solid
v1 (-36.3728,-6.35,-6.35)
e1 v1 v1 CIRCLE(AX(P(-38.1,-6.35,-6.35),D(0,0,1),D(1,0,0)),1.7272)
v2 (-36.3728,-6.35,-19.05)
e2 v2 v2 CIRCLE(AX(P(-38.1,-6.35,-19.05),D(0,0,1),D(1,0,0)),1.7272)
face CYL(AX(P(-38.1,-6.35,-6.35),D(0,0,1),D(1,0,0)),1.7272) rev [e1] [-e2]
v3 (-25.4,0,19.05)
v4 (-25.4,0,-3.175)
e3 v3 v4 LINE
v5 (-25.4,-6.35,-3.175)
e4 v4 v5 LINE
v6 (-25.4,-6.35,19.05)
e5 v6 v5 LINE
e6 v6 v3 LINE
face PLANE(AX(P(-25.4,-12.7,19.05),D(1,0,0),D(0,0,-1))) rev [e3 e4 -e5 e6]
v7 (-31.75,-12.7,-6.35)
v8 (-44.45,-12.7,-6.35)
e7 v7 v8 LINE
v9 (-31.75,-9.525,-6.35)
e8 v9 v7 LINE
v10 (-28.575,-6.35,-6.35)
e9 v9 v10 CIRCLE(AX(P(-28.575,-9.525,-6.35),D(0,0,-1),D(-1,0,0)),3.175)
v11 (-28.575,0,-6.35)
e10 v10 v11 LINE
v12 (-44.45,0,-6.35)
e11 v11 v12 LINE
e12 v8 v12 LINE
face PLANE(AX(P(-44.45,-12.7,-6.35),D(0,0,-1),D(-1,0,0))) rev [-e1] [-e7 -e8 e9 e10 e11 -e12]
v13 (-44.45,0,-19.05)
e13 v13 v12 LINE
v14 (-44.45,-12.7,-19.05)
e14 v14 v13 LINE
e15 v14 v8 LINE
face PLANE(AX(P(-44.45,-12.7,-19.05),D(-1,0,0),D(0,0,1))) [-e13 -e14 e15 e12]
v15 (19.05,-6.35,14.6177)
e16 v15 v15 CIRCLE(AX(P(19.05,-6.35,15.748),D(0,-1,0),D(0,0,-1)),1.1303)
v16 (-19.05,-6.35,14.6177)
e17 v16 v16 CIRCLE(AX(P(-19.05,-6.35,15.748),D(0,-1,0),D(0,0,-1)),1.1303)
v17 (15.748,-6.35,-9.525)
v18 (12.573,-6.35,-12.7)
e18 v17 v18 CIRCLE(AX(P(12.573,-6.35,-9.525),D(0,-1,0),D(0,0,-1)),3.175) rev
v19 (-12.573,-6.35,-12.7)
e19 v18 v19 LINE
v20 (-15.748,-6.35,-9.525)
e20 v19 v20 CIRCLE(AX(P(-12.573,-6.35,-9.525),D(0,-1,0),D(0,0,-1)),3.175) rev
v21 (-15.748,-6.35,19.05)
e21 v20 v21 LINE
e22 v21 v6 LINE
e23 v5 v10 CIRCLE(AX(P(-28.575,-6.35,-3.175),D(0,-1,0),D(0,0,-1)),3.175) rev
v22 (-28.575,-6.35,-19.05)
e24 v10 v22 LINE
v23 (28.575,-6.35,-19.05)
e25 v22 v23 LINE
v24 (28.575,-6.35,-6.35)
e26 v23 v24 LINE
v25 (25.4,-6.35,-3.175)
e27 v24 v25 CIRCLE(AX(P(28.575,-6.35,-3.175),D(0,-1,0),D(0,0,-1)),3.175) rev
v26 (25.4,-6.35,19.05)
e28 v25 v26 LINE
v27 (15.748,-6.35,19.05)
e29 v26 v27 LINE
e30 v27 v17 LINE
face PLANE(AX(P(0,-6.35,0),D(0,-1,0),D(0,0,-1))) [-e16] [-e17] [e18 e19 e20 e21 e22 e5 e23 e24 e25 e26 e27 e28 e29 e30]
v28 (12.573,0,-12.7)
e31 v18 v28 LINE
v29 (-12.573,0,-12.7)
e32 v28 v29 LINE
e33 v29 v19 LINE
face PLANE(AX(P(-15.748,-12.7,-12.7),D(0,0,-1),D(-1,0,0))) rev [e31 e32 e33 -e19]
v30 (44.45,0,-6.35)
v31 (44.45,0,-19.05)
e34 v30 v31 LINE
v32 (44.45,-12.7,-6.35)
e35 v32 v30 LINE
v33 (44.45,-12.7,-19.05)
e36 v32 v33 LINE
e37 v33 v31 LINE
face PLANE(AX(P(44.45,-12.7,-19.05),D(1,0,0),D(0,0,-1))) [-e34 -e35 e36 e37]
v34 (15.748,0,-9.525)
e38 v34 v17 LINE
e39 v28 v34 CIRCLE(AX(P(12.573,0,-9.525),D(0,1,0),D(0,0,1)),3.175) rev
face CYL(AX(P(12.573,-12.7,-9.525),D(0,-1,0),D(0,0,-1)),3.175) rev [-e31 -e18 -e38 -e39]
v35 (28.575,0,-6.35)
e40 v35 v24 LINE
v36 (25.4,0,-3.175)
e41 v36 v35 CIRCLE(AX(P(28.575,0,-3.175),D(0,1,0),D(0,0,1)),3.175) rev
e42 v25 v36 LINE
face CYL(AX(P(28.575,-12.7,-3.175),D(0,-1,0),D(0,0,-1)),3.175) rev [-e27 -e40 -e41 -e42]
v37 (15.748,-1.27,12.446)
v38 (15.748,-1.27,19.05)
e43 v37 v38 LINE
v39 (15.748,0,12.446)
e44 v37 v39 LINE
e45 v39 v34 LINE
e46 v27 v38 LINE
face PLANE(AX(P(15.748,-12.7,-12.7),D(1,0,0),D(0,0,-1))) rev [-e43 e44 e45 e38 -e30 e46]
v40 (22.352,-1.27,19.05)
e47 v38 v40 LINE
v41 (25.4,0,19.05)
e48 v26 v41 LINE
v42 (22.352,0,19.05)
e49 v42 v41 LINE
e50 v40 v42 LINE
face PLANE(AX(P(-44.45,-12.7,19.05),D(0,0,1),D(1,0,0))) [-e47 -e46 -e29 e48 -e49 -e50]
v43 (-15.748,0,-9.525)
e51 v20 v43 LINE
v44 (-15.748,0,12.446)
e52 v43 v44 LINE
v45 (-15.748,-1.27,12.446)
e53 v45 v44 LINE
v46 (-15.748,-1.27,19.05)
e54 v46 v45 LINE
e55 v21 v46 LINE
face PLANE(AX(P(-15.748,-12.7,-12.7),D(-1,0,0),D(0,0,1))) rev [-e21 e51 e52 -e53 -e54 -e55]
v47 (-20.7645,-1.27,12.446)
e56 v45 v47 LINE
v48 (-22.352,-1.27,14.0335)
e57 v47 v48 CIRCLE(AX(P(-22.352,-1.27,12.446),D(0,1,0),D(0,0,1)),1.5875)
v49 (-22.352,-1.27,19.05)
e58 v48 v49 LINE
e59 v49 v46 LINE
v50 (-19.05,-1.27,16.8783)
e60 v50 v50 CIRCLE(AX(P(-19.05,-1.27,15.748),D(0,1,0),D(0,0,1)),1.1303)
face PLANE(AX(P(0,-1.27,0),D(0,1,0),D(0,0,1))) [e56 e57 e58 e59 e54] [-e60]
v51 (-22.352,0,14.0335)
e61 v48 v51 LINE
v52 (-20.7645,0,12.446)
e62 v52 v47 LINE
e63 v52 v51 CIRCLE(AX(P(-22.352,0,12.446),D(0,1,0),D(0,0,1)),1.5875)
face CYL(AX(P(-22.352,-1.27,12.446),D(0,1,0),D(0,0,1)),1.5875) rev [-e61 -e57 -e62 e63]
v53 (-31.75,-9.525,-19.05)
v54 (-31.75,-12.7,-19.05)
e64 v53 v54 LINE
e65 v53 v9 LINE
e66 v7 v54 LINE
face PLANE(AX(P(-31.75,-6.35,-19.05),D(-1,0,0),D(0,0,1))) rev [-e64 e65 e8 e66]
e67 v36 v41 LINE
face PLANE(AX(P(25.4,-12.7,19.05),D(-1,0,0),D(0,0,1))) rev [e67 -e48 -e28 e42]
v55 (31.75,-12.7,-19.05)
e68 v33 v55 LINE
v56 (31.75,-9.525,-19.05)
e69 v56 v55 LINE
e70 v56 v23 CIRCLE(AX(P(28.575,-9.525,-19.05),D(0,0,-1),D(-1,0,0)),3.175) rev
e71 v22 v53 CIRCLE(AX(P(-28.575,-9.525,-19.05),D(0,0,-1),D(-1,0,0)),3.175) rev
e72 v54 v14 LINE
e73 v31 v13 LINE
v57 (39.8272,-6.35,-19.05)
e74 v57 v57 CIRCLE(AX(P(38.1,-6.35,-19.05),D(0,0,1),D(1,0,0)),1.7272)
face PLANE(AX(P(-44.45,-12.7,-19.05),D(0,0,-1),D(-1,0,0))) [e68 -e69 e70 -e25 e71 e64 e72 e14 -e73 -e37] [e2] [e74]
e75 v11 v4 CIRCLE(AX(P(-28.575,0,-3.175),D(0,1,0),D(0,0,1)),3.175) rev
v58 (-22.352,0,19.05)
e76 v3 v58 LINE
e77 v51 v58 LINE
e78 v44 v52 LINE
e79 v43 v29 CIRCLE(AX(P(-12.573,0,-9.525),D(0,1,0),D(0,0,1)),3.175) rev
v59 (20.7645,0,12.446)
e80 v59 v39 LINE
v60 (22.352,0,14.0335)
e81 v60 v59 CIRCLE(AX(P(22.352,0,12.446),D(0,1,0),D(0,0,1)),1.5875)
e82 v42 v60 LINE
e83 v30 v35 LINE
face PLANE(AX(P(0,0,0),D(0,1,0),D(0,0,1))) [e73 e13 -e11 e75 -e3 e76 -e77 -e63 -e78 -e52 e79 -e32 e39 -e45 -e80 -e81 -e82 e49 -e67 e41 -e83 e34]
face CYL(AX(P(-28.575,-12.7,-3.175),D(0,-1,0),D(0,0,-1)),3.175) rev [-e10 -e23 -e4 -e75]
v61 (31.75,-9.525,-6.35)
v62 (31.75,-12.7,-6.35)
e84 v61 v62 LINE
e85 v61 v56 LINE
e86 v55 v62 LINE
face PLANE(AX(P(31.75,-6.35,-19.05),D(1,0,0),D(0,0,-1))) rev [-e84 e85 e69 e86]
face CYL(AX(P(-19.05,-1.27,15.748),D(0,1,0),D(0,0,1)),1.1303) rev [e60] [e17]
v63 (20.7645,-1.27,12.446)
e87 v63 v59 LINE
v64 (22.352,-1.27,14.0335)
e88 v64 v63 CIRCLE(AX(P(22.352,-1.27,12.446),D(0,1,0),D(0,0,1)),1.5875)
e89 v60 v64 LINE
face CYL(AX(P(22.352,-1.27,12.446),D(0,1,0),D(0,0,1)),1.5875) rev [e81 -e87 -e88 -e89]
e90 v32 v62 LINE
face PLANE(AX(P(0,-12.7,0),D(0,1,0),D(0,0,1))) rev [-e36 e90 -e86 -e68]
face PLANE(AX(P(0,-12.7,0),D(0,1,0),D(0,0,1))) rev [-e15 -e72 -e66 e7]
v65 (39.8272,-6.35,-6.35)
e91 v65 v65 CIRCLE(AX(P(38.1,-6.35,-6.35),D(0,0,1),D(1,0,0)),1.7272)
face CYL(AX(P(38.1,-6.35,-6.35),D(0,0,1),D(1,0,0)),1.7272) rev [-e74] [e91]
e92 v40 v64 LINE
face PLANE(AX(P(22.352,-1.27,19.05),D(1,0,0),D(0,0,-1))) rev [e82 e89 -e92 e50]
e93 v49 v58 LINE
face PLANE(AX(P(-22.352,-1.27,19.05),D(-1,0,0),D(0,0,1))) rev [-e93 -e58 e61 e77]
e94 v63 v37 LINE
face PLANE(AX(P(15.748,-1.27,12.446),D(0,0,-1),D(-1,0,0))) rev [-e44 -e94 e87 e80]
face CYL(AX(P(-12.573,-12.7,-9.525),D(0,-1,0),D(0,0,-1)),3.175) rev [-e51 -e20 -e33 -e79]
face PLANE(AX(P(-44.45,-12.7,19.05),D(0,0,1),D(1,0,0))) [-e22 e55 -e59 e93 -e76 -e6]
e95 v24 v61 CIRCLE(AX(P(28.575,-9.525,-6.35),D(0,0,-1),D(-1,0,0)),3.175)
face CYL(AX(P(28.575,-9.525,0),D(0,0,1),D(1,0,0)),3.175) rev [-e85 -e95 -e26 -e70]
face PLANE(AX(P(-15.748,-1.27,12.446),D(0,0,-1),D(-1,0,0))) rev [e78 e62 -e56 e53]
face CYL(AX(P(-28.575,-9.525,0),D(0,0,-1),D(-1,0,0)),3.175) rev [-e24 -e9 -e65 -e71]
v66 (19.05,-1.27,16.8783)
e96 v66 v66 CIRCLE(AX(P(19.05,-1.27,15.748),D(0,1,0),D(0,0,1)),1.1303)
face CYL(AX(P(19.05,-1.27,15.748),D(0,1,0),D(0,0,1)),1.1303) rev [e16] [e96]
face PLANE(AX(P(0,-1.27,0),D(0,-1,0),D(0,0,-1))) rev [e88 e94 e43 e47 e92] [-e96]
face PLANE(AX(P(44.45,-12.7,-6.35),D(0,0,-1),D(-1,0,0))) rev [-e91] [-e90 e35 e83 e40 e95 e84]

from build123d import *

# Parameters (mm, degrees)
SKETCH1_W             = 88.9
SKETCH1_H             = 38.1
BOSS_EXTRUDE1_DEPTH   = 12.7
SKETCH2_W             = 19.05
SKETCH2_H             = 25.4
CUT_EXTRUDE2_DEPTH    = 50.99995
SKETCH5_W             = 31.496
SKETCH5_H             = 31.75
CUT_EXTRUDE3_DEPTH    = 50.99995
BOSS_EXTRUDE2_START   = -6.35
BOSS_EXTRUDE2_DEPTH   = 6.35
SKETCH7_W             = 6.604
SKETCH7_H             = 6.604
CUT_EXTRUDE4_DEPTH    = 1.27
F_4_40_TAPPED_HOLE2_D = 2.2606
F_8_32_TAPPED_HOLE1_D = 3.4544
SKETCH20_R            = 1.5875
CUT_EXTRUDE5_DEPTH    = 1.27
FILLET3_R             = 3.175
SKETCH21_W            = 6.35
SKETCH21_H            = 12.7
CUT_EXTRUDE6_DEPTH    = 6.35
FILLET4_R             = 3.175
FILLET5_R             = 3.175
FILLET6_R             = 3.175
FILLET7_R             = 3.175


# Read off the part's stored shape, not the designer's step: Boss-Extrude2
with BuildPart() as part:
    # Sketch1 → Boss-Extrude1 (new body)
    with BuildSketch(Plane(origin=(0, 0, 0), x_dir=(1, 0, 0), z_dir=(0, 1, 0))):
        Rectangle(SKETCH1_W, SKETCH1_H)
    extrude(amount=-BOSS_EXTRUDE1_DEPTH)

    # Sketch2 → Cut-Extrude2 (cut, through all)
    with BuildSketch(Plane(origin=(0, 0, 0), x_dir=(1, 0, 0), z_dir=(0, 1, 0))):
        with Locations((-34.925, -6.35)):
            Rectangle(SKETCH2_W, SKETCH2_H)
        with Locations((34.925, -6.35)):
            Rectangle(SKETCH2_W, SKETCH2_H)
    extrude(amount=-CUT_EXTRUDE2_DEPTH, mode=Mode.SUBTRACT)

    # Sketch5 → Cut-Extrude3 (cut, through all)
    with BuildSketch(Plane(origin=(0, 0, 0), x_dir=(1, 0, 0), z_dir=(0, 1, 0))):
        with Locations((0, -3.175)):
            Rectangle(SKETCH5_W, SKETCH5_H)
    extrude(amount=-CUT_EXTRUDE3_DEPTH, mode=Mode.SUBTRACT)

    # Boss-Extrude2 outline → Boss-Extrude2 (cut)
    with BuildSketch(Plane.XZ.offset(12.7).offset(BOSS_EXTRUDE2_START)):
        Polygon((-25.4, 19.05), (-25.4, -19.05), (25.4, -19.05), (25.4, 19.05), (15.748, 19.05), (15.748, -12.7), (-15.748, -12.7), (-15.748, 19.05), align=None)
    extrude(amount=BOSS_EXTRUDE2_DEPTH, mode=Mode.SUBTRACT)

    # Sketch7 → Cut-Extrude4 (cut)
    with BuildSketch(Plane(origin=(0, 0, 0), x_dir=(1, 0, 0), z_dir=(0, 1, 0))):
        with Locations((-19.05, -15.748)):
            Rectangle(SKETCH7_W, SKETCH7_H)
        with Locations((19.05, -15.748)):
            Rectangle(SKETCH7_W, SKETCH7_H)
    extrude(amount=-CUT_EXTRUDE4_DEPTH, mode=Mode.SUBTRACT)

    # #4-40 Tapped Hole2 (through all)
    with Locations(Plane(origin=(-19.05, -1.27, 15.748), x_dir=(0, 0, 1), z_dir=(0, 1, 0))):
        with Locations((0, 0), (0, 38.1)):
            Hole(F_4_40_TAPPED_HOLE2_D / 2)

    # #8-32 Tapped Hole1 (through all)
    with Locations(Plane(origin=(-38.1, -6.35, -6.35), x_dir=(1, 0, 0), z_dir=(0, 0, 1))):
        with Locations((0, 0), (76.2, 0)):
            Hole(F_8_32_TAPPED_HOLE1_D / 2)

    # Sketch20 → Cut-Extrude5 (cut)
    with BuildSketch(Plane(origin=(0, 0, 0), x_dir=(1, 0, 0), z_dir=(0, 1, 0))):
        with Locations((-22.352, -12.446)):
            Circle(SKETCH20_R)
        with Locations((22.352, -12.446)):
            Circle(SKETCH20_R)
    extrude(amount=-CUT_EXTRUDE5_DEPTH, mode=Mode.SUBTRACT)

    # Fillet3
    fillet3_edges = [part.edges().sort_by_distance(p)[0] for p in [
        (15.748, -3.175, -12.7),
        (-15.748, -3.175, -12.7),
    ]]
    fillet(fillet3_edges, radius=FILLET3_R)

    # Sketch21 → Cut-Extrude6 (cut)
    with BuildSketch(Plane.XZ.offset(12.7)):
        with Locations((-28.575, -12.7)):
            Rectangle(SKETCH21_W, SKETCH21_H)
        with Locations((28.575, -12.7)):
            Rectangle(SKETCH21_W, SKETCH21_H)
    extrude(amount=-CUT_EXTRUDE6_DEPTH, mode=Mode.SUBTRACT)

    # Fillet4
    fillet4_edges = [part.edges().sort_by_distance(p)[0] for p in [
        (-31.75, -6.35, -12.7),
    ]]
    fillet(fillet4_edges, radius=FILLET4_R)

    # Fillet5
    fillet5_edges = [part.edges().sort_by_distance(p)[0] for p in [
        (31.75, -6.35, -12.7),
    ]]
    fillet(fillet5_edges, radius=FILLET5_R)

    # Fillet6
    fillet6_edges = [part.edges().sort_by_distance(p)[0] for p in [
        (-25.4, -3.175, -6.35),
    ]]
    fillet(fillet6_edges, radius=FILLET6_R)

    # Fillet7
    fillet7_edges = [part.edges().sort_by_distance(p)[0] for p in [
        (25.4, -3.175, -6.35),
    ]]
    fillet(fillet7_edges, radius=FILLET7_R)


solid = part.part
